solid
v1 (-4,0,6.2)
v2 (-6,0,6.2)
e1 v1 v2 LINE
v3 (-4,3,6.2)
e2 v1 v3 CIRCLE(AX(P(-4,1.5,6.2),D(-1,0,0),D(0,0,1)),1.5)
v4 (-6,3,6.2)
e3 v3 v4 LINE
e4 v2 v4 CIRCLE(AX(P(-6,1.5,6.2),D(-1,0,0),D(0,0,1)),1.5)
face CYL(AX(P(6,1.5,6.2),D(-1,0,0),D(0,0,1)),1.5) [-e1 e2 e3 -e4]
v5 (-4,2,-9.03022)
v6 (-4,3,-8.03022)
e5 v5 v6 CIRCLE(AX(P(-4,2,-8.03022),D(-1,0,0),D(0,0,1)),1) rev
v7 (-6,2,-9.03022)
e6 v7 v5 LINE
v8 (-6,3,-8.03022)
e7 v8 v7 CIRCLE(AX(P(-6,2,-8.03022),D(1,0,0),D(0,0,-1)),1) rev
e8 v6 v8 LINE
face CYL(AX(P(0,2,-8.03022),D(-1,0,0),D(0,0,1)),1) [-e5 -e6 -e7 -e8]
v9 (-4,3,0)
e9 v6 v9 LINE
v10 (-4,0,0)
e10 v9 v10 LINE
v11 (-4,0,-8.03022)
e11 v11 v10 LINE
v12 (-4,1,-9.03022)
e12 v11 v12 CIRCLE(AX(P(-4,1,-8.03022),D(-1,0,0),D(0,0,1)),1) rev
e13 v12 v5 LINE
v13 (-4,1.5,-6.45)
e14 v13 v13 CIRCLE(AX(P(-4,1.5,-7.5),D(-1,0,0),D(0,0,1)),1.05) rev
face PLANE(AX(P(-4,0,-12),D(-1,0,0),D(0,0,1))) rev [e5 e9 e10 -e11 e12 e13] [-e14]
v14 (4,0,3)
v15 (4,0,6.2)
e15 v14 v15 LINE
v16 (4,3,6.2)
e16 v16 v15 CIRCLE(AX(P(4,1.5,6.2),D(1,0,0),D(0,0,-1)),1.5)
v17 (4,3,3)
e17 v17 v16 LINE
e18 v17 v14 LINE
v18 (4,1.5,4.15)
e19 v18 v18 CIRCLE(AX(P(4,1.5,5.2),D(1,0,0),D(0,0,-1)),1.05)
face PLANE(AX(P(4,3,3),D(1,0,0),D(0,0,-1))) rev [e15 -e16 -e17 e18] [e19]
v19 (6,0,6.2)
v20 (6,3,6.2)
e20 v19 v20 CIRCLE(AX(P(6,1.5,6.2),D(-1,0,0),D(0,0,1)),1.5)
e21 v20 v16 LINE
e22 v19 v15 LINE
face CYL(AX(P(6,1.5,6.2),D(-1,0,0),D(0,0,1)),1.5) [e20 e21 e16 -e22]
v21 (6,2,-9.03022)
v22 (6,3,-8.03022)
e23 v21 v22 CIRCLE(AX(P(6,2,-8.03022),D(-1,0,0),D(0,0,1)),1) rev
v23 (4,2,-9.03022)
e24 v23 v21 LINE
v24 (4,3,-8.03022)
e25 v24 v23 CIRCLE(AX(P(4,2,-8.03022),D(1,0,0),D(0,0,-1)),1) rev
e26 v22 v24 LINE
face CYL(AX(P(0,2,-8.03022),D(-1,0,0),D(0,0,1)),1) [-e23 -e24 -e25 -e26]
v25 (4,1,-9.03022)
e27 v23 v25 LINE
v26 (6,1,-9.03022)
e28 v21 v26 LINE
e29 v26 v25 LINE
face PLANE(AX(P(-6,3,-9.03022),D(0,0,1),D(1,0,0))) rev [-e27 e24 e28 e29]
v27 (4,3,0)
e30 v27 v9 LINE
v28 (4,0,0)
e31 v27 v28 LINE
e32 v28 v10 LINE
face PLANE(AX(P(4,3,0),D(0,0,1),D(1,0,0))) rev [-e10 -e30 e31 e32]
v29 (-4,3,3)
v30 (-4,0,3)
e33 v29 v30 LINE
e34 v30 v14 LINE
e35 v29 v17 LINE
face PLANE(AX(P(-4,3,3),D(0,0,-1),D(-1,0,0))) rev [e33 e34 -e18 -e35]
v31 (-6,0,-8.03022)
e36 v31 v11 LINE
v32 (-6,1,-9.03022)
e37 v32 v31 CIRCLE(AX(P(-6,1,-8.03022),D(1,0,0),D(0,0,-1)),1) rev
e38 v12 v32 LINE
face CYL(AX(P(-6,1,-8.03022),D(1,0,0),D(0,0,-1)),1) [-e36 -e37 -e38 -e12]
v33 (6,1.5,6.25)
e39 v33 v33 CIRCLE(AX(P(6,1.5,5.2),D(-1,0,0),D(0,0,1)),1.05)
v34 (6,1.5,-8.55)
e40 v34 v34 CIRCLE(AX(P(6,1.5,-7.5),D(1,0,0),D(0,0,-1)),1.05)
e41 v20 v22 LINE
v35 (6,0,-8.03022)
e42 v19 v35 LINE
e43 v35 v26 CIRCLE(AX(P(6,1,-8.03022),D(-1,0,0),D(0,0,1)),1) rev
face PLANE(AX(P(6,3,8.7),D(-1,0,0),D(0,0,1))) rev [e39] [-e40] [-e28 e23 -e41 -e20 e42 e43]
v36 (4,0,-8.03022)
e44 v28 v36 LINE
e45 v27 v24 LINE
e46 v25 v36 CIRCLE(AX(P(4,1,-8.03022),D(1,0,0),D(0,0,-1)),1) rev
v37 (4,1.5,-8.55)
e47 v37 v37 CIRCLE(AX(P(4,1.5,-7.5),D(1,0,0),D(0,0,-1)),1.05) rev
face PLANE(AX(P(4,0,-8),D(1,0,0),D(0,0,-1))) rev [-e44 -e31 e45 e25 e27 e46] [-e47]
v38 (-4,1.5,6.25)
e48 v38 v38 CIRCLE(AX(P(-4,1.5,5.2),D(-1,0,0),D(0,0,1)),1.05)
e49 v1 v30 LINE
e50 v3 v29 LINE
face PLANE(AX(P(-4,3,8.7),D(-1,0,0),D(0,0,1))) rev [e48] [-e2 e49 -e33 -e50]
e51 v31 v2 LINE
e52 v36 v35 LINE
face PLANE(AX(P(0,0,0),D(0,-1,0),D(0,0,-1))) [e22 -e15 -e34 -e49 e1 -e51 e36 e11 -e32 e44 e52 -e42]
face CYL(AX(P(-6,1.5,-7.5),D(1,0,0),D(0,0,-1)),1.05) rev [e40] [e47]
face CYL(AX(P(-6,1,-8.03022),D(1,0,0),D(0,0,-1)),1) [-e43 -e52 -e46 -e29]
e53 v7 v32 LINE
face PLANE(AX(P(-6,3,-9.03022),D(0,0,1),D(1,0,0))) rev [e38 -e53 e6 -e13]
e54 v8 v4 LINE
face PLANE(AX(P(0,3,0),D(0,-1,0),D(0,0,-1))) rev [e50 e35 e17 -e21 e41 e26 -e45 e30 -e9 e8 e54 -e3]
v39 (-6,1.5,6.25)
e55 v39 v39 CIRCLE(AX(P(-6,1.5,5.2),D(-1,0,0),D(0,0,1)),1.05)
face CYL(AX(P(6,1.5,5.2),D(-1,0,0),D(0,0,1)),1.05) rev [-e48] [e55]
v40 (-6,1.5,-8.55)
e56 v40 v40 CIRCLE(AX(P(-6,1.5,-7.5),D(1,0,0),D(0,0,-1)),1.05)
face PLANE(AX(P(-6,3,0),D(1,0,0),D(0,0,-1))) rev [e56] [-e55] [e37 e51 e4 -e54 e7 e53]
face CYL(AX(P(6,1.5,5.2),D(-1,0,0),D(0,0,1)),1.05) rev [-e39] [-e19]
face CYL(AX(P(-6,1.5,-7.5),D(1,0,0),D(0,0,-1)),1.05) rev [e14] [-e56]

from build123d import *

# Parameters (mm, degrees)
EXTRUDE_1_DEPTH     = 3
SKETCH_2_OUTSIDE_W  = 13.724
SKETCH_2_OUTSIDE_H  = 8.024
CUT_EXTRUDE_1_DEPTH = 12
SKETCH_3_R          = 1.05
CUT_EXTRUDE_2_DEPTH = 12
FILLET_1_R          = 1
SKETCH_4_R          = 0.95
EXTRUDE_2_DEPTH     = 4
SKETCH_5_W          = 12
SKETCH_5_H          = 3
EXTRUDE_3_DEPTH     = 8
SKETCH_6_R          = 1.05
CUT_EXTRUDE_3_DEPTH = 12
CUT_EXTRUDE_4_DEPTH = 14.747727085
FILLET_2_R          = 1
SKETCH_9_W          = 11.8
SKETCH_9_H          = 3
EXTRUDE_4_DEPTH     = 4
SKETCH_10_W         = 8
SKETCH_10_H         = 4
CUT_EXTRUDE_5_DEPTH = 10
SKETCH_12_W         = 12
SKETCH_12_H         = 3
EXTRUDE_5_DEPTH     = 2
FILLET_3_R          = 1
SKETCH_13_W         = 12
SKETCH_13_H         = 2.969780185
CUT_EXTRUDE_6_DEPTH = 14.747727085
FILLET_4_R          = 1
SKETCH_15_W         = 8
SKETCH_15_H         = 4
CUT_EXTRUDE_7_DEPTH = 12.249216413
SKETCH_16_W         = 2
SKETCH_16_H         = 4.595961916
EXTRUDE_6_DEPTH     = 3


with BuildPart() as part:
    # 草图1 → 凸台-拉伸1 (new body)
    with BuildSketch(Plane(origin=(0, 0, 0), x_dir=(1, 0, 0), z_dir=(0, 1, 0))):
        Polygon((-6, 0), (6, 0), (6, -8.7), (4, -8.7), (4, -3), (-4, -3), (-4, -8.7), (-6, -8.7), align=None)
    extrude(amount=EXTRUDE_1_DEPTH)

    # 草图2 outside → 切除-拉伸1 (cut)
    with BuildSketch(Plane.ZY.offset(6)):
        with Locations((4.35, 1.5)):
            Rectangle(SKETCH_2_OUTSIDE_W, SKETCH_2_OUTSIDE_H)
        with BuildLine():
            Line((6.2, 3), (0, 3))
            Line((0, 3), (0, 0))
            Line((0, 0), (6.2, 0))
            ThreePointArc((6.2, 0), (7.7, 1.5), (6.2, 3))
        make_face(mode=Mode.SUBTRACT)
    extrude(amount=-CUT_EXTRUDE_1_DEPTH, mode=Mode.SUBTRACT)

    # 草图3 → 切除-拉伸2 (cut)
    with BuildSketch(Plane.ZY.offset(6)):
        with Locations((5.2, 1.5)):
            Circle(SKETCH_3_R)
    extrude(amount=-CUT_EXTRUDE_2_DEPTH, mode=Mode.SUBTRACT)

    # 圆角1
    fillet_1_edges = [part.edges().sort_by_distance(p)[0] for p in [
        (-6, 1.5, 0),
        (6, 1.5, 0),
    ]]
    fillet(fillet_1_edges, radius=FILLET_1_R)

    # 草图4 → 凸台-拉伸2 (add)
    with BuildSketch(Plane(origin=(0, 0, 0), x_dir=(-1, 0, 0), z_dir=(0, 0, -1))):
        with Locations(Location((0, 1.5, 0), (0, 0, 180))):
            Circle(SKETCH_4_R)
    extrude(amount=EXTRUDE_2_DEPTH)

    # 草图5 → 凸台-拉伸3 (add)
    with BuildSketch(Plane(origin=(0, 0, -4), x_dir=(-1, 0, 0), z_dir=(0, 0, -1))):
        with Locations((0, 1.5)):
            Rectangle(SKETCH_5_W, SKETCH_5_H)
    extrude(amount=EXTRUDE_3_DEPTH)

    # 草图6 → 切除-拉伸3 (cut)
    with BuildSketch(Plane(origin=(6, 0, 0), x_dir=(0, 0, -1), z_dir=(1, 0, 0))):
        with Locations((7.5, 1.5)):
            Circle(SKETCH_6_R)
    extrude(amount=-CUT_EXTRUDE_3_DEPTH, mode=Mode.SUBTRACT)

    # 草图8 → 切除-拉伸4 (cut, through all)
    with BuildSketch(Plane(origin=(0, 3, 0), x_dir=(1, 0, 0), z_dir=(0, 1, 0))):
        Polygon((-1.5, 8), (1.5, 8), (4, 8), (4, 12), (1.5, 12), (-1.5, 12), (-4, 12), (-4, 8), align=None)
    extrude(amount=-CUT_EXTRUDE_4_DEPTH, mode=Mode.SUBTRACT)

    # 圆角2
    fillet_2_edges = [part.edges().sort_by_distance(p)[0] for p in [
        (-5, 0, -12),
        (5, 0, -12),
    ]]
    fillet(fillet_2_edges, radius=FILLET_2_R)

    # 草图9 → 凸台-拉伸4 (add)
    with BuildSketch(Plane.XY.offset(-4)):
        with Locations((0, 1.5)):
            Rectangle(SKETCH_9_W, SKETCH_9_H)
    extrude(amount=EXTRUDE_4_DEPTH)

    # 草图10 → 切除-拉伸5 (cut)
    with BuildSketch(Plane(origin=(0, 3, 0), x_dir=(1, 0, 0), z_dir=(0, 1, 0))):
        with Locations((0, 6)):
            Rectangle(SKETCH_10_W, SKETCH_10_H)
    extrude(amount=-CUT_EXTRUDE_5_DEPTH, mode=Mode.SUBTRACT)

    # 草图12 → 凸台-拉伸5 (add)
    with BuildSketch(Plane.XY.offset(-4)):
        with Locations((0, 1.5)):
            Rectangle(SKETCH_12_W, SKETCH_12_H)
    extrude(amount=EXTRUDE_5_DEPTH)

    # 圆角3
    # the kernel refuses this fillet: 1 mm, written as the material it takes off along each edge
    with BuildSketch(Plane(origin=(6, 4.089724736, -2), x_dir=(0, 0, -1), z_dir=(0, -1, 0)), Plane(origin=(-6, -1.089724736, -2), x_dir=(0, 0, -1), z_dir=(0, 1, 0))) as fillet_3_piece_1:
        with BuildLine():
            CenterArc((0.435889894, -1), FILLET_3_R, 90, 25.841932763)
            Line((0, -0.1), (-0.008717798, -0.082))
            ThreePointArc((-0.008717798, -0.082), (-0.02, -0.05), (-0.02, 0))
            Line((-0.02, 0), (0, 0.02))
            Line((0, 0.02), (0.435889894, 0.02))
            Line((0.435889894, 0.02), (0.435889894, 0))
        make_face()
    extrude(amount=5.179449472, mode=Mode.SUBTRACT)

    # 草图13 → 切除-拉伸6 (cut, through all)
    with BuildSketch(Plane.XZ):
        with Locations((0, -10.515109908)):
            Rectangle(SKETCH_13_W, SKETCH_13_H)
    extrude(amount=-CUT_EXTRUDE_6_DEPTH, mode=Mode.SUBTRACT)

    # 圆角4
    fillet_4_edges = [part.edges().sort_by_distance(p)[0] for p in [
        (5, 3, -9.030219815),
        (-5, 3, -9.030219815),
        (5, 0, -9.030219815),
        (-5, 0, -9.030219815),
    ]]
    fillet(fillet_4_edges, radius=FILLET_4_R)

    # 草图15 → 切除-拉伸7 (cut, through all)
    with BuildSketch(Plane.XZ):
        with Locations((0, -2)):
            Rectangle(SKETCH_15_W, SKETCH_15_H)
    extrude(amount=-CUT_EXTRUDE_7_DEPTH, mode=Mode.SUBTRACT)

    # 草图16 → 凸台-拉伸6 (add, through all)
    with BuildSketch(Plane.XZ):
        with Locations((-5, -0.242379669)):
            Rectangle(SKETCH_16_W, SKETCH_16_H)
        with Locations((5, -0.242379669)):
            Rectangle(SKETCH_16_W, SKETCH_16_H)
    extrude(amount=-EXTRUDE_6_DEPTH)


solid = part.part
